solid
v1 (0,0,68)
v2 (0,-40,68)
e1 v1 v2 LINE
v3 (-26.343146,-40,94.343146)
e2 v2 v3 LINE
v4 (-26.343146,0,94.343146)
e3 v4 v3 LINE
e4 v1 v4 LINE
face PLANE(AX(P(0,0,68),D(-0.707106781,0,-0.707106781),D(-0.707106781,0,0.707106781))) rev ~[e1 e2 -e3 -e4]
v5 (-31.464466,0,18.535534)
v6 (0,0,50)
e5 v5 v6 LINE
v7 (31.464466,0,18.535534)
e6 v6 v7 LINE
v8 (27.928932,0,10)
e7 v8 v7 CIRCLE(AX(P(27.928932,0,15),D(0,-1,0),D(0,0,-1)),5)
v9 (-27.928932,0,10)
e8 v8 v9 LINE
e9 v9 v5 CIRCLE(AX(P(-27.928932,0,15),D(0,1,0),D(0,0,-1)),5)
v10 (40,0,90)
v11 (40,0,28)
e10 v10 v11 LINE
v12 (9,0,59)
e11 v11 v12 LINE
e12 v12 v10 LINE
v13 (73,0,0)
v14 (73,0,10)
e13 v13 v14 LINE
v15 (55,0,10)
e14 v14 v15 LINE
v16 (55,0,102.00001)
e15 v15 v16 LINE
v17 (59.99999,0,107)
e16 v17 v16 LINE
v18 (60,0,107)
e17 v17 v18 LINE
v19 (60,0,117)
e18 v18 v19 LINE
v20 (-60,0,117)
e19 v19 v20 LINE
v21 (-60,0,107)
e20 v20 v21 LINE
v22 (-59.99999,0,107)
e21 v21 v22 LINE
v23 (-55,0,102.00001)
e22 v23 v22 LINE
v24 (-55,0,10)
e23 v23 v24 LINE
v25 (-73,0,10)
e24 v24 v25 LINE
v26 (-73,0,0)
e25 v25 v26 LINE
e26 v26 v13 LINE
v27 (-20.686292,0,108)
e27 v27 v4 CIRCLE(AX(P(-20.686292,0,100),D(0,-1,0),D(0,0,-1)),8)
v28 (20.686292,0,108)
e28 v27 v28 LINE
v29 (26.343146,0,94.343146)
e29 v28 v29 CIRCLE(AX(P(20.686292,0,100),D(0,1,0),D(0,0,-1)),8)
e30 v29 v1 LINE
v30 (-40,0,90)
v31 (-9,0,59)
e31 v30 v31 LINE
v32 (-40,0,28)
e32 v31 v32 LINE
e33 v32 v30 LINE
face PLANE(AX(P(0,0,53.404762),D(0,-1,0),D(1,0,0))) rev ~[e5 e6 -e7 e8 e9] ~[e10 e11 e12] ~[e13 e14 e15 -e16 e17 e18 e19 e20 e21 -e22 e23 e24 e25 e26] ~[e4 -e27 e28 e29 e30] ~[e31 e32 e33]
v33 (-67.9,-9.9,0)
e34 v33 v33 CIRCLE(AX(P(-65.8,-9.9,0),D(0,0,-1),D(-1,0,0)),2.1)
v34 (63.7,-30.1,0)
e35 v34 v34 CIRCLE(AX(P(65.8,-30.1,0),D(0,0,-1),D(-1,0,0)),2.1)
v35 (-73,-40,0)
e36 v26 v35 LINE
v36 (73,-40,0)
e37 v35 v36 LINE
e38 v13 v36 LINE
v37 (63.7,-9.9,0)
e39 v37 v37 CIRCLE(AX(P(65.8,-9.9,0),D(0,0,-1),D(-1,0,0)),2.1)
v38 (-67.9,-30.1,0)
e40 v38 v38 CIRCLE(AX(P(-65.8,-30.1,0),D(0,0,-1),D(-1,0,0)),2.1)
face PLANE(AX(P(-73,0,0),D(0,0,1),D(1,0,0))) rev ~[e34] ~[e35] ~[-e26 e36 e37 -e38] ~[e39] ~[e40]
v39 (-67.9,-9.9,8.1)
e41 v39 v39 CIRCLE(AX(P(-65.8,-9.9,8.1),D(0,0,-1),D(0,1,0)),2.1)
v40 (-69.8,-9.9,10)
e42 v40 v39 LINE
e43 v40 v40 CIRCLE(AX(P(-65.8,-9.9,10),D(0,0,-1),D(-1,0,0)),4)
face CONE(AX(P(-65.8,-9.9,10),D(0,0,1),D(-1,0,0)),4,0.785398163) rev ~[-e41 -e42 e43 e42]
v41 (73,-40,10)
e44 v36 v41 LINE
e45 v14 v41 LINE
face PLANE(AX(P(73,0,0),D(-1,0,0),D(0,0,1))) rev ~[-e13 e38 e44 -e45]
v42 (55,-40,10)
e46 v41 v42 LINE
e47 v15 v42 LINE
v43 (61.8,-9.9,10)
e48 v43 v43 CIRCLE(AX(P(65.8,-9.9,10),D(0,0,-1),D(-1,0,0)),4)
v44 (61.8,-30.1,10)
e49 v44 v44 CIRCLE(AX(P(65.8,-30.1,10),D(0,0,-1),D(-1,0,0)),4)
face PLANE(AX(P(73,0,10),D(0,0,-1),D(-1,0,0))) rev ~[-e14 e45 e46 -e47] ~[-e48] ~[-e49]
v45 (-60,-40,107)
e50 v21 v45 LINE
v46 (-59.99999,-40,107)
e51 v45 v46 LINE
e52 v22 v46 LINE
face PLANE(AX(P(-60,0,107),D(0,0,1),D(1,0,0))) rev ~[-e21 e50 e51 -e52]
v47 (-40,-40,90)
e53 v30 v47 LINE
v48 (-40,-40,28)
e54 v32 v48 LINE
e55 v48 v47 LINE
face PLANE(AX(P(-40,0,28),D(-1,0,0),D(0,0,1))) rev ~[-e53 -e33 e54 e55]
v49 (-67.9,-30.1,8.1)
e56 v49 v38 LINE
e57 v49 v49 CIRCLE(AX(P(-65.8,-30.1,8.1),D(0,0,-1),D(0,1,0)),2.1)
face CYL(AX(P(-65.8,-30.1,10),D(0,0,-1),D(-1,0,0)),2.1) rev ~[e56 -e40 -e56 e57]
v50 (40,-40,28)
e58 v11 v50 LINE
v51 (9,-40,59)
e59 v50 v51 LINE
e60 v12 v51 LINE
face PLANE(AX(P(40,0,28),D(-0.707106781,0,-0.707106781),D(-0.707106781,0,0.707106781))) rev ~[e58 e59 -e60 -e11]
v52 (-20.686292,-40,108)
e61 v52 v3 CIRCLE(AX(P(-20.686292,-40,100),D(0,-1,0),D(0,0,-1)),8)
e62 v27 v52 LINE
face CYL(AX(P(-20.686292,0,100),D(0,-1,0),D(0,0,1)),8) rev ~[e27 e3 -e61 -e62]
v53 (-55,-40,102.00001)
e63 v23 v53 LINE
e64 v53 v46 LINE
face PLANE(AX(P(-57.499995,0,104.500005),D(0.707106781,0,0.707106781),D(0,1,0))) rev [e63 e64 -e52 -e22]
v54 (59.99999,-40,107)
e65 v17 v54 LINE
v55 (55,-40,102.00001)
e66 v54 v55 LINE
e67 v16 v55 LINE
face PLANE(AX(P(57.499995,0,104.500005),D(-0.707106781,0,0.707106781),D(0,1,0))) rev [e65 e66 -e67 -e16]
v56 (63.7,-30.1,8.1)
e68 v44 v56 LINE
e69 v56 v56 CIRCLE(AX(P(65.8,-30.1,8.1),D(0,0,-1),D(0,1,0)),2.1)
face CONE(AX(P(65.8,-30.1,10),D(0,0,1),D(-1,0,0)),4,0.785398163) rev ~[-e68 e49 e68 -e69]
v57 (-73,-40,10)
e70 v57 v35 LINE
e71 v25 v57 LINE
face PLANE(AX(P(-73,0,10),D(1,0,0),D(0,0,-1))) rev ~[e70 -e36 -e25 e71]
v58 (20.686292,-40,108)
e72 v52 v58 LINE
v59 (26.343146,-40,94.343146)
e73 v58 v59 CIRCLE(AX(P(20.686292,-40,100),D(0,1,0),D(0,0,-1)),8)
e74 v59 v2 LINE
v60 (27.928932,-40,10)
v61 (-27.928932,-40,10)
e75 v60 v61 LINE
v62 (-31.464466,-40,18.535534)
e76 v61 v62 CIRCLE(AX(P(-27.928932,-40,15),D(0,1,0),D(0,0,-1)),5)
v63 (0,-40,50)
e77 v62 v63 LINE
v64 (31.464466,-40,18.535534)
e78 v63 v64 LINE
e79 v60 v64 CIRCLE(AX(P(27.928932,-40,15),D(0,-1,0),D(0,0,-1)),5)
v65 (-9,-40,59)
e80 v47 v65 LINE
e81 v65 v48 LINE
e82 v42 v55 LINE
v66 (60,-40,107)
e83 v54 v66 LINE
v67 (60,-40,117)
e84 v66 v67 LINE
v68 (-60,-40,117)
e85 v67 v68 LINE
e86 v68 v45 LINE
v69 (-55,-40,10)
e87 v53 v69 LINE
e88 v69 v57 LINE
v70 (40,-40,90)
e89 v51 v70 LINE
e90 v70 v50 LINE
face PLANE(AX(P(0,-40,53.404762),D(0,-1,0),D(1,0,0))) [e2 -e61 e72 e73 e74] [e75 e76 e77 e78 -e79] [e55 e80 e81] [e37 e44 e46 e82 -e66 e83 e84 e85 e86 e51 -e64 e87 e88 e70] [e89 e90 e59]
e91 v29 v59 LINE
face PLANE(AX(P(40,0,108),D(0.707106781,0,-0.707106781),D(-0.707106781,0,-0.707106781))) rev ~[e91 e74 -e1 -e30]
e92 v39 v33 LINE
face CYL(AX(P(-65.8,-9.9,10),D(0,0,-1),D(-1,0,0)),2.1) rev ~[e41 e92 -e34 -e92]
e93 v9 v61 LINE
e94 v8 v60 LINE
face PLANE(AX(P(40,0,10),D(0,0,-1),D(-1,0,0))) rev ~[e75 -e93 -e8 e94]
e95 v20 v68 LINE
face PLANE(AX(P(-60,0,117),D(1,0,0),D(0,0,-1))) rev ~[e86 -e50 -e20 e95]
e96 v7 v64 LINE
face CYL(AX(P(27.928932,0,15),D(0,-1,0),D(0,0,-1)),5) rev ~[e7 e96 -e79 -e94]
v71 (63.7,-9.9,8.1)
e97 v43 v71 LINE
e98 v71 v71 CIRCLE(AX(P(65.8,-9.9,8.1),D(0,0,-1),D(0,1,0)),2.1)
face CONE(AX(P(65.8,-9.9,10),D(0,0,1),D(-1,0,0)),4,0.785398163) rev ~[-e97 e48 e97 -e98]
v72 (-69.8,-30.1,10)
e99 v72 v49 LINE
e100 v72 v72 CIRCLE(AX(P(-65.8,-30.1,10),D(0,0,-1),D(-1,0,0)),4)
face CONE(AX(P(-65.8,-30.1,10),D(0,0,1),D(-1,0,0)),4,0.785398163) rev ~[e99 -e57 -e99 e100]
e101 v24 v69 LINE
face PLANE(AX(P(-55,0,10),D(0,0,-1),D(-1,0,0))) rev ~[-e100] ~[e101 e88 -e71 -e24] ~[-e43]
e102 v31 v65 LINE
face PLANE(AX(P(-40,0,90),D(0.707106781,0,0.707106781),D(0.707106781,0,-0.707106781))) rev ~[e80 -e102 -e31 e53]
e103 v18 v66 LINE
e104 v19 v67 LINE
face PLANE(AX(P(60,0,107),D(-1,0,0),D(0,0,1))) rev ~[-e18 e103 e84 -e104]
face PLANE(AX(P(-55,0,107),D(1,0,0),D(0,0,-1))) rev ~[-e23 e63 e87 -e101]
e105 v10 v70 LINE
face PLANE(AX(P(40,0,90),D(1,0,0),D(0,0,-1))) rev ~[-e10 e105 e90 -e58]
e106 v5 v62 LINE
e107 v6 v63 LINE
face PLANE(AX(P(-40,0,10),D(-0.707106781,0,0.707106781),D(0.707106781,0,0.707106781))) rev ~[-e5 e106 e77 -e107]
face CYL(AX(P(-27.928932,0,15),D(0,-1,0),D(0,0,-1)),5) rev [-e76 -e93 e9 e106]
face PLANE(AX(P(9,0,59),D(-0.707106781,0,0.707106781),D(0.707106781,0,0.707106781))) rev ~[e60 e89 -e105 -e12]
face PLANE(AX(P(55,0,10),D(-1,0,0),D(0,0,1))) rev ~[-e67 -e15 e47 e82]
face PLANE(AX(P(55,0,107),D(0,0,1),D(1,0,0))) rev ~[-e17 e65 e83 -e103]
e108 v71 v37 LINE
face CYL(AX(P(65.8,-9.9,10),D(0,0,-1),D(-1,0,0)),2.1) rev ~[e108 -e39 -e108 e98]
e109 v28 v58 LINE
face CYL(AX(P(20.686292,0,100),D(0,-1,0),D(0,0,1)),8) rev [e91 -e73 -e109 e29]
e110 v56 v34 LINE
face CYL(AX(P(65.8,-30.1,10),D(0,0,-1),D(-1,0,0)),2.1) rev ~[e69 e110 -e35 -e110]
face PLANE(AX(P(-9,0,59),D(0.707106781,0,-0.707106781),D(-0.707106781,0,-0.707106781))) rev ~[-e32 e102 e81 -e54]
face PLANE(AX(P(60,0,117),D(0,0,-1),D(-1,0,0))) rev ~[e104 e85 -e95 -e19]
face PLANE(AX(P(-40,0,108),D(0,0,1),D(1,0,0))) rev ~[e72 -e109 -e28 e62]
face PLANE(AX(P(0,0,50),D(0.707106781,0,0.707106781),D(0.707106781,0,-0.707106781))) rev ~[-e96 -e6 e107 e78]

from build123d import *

# Parameters (mm, degrees)
F1_DEPTH       = 40
F2_R           = 8
F3_R           = 5
F5_D           = 4.2
F5_CSINK_D     = 8
F5_CSINK_ANGLE = 90
F6_SIZE        = 4.99999


# Not quite as in the source:
# - a fillet or chamfer is up to 0.001 mm smaller than in the source, because OpenCascade refuses the exact size


with BuildPart() as f1:
    # F0 (on Front) → F1 (new body)
    with BuildSketch(Plane.XZ):
        Polygon((-73, 10), (-73, 0), (0, 0), (73, 0), (73, 10), (55, 10), (55, 107), (60, 107), (60, 117), (0, 117), (-60, 117), (-60, 107), (-55, 107), (-55, 10), align=None)
        Polygon((0, 10), (-40, 10), (0, 50), (40, 10), align=None, mode=Mode.SUBTRACT)
        Polygon((-9, 59), (-40, 28), (-40, 90), align=None, mode=Mode.SUBTRACT)
        Polygon((40, 90), (40, 28), (9, 59), align=None, mode=Mode.SUBTRACT)
        Polygon((40, 108), (0, 68), (-40, 108), (0, 108), align=None, mode=Mode.SUBTRACT)
    extrude(amount=F1_DEPTH)

    # F2
    f2_edges = [f1.edges().sort_by_distance(p)[0] for p in [
        (-40, -20, 108),
        (40, -20, 108),
    ]]
    fillet(f2_edges, radius=F2_R)

    # F3
    f3_edges = [f1.edges().sort_by_distance(p)[0] for p in [
        (-40, -20, 10),
        (40, -20, 10),
    ]]
    fillet(f3_edges, radius=F3_R)

    # F5 (through all)
    with Locations(Plane.XY.offset(10)):
        with Locations((-65.8, -9.9), (-65.8, -30.1), (65.8, -30.1), (65.8, -9.9)):
            CounterSinkHole(F5_D / 2, F5_CSINK_D / 2, counter_sink_angle=F5_CSINK_ANGLE)

    # F6 (size 5 in the source; OpenCascade refuses exactly that, so slightly less here)
    f6_edges = [f1.edges().sort_by_distance(p)[0] for p in [
        (-55, -20, 107),
        (55, -20, 107),
    ]]
    chamfer(f6_edges, length=F6_SIZE)


solid = f1.part
